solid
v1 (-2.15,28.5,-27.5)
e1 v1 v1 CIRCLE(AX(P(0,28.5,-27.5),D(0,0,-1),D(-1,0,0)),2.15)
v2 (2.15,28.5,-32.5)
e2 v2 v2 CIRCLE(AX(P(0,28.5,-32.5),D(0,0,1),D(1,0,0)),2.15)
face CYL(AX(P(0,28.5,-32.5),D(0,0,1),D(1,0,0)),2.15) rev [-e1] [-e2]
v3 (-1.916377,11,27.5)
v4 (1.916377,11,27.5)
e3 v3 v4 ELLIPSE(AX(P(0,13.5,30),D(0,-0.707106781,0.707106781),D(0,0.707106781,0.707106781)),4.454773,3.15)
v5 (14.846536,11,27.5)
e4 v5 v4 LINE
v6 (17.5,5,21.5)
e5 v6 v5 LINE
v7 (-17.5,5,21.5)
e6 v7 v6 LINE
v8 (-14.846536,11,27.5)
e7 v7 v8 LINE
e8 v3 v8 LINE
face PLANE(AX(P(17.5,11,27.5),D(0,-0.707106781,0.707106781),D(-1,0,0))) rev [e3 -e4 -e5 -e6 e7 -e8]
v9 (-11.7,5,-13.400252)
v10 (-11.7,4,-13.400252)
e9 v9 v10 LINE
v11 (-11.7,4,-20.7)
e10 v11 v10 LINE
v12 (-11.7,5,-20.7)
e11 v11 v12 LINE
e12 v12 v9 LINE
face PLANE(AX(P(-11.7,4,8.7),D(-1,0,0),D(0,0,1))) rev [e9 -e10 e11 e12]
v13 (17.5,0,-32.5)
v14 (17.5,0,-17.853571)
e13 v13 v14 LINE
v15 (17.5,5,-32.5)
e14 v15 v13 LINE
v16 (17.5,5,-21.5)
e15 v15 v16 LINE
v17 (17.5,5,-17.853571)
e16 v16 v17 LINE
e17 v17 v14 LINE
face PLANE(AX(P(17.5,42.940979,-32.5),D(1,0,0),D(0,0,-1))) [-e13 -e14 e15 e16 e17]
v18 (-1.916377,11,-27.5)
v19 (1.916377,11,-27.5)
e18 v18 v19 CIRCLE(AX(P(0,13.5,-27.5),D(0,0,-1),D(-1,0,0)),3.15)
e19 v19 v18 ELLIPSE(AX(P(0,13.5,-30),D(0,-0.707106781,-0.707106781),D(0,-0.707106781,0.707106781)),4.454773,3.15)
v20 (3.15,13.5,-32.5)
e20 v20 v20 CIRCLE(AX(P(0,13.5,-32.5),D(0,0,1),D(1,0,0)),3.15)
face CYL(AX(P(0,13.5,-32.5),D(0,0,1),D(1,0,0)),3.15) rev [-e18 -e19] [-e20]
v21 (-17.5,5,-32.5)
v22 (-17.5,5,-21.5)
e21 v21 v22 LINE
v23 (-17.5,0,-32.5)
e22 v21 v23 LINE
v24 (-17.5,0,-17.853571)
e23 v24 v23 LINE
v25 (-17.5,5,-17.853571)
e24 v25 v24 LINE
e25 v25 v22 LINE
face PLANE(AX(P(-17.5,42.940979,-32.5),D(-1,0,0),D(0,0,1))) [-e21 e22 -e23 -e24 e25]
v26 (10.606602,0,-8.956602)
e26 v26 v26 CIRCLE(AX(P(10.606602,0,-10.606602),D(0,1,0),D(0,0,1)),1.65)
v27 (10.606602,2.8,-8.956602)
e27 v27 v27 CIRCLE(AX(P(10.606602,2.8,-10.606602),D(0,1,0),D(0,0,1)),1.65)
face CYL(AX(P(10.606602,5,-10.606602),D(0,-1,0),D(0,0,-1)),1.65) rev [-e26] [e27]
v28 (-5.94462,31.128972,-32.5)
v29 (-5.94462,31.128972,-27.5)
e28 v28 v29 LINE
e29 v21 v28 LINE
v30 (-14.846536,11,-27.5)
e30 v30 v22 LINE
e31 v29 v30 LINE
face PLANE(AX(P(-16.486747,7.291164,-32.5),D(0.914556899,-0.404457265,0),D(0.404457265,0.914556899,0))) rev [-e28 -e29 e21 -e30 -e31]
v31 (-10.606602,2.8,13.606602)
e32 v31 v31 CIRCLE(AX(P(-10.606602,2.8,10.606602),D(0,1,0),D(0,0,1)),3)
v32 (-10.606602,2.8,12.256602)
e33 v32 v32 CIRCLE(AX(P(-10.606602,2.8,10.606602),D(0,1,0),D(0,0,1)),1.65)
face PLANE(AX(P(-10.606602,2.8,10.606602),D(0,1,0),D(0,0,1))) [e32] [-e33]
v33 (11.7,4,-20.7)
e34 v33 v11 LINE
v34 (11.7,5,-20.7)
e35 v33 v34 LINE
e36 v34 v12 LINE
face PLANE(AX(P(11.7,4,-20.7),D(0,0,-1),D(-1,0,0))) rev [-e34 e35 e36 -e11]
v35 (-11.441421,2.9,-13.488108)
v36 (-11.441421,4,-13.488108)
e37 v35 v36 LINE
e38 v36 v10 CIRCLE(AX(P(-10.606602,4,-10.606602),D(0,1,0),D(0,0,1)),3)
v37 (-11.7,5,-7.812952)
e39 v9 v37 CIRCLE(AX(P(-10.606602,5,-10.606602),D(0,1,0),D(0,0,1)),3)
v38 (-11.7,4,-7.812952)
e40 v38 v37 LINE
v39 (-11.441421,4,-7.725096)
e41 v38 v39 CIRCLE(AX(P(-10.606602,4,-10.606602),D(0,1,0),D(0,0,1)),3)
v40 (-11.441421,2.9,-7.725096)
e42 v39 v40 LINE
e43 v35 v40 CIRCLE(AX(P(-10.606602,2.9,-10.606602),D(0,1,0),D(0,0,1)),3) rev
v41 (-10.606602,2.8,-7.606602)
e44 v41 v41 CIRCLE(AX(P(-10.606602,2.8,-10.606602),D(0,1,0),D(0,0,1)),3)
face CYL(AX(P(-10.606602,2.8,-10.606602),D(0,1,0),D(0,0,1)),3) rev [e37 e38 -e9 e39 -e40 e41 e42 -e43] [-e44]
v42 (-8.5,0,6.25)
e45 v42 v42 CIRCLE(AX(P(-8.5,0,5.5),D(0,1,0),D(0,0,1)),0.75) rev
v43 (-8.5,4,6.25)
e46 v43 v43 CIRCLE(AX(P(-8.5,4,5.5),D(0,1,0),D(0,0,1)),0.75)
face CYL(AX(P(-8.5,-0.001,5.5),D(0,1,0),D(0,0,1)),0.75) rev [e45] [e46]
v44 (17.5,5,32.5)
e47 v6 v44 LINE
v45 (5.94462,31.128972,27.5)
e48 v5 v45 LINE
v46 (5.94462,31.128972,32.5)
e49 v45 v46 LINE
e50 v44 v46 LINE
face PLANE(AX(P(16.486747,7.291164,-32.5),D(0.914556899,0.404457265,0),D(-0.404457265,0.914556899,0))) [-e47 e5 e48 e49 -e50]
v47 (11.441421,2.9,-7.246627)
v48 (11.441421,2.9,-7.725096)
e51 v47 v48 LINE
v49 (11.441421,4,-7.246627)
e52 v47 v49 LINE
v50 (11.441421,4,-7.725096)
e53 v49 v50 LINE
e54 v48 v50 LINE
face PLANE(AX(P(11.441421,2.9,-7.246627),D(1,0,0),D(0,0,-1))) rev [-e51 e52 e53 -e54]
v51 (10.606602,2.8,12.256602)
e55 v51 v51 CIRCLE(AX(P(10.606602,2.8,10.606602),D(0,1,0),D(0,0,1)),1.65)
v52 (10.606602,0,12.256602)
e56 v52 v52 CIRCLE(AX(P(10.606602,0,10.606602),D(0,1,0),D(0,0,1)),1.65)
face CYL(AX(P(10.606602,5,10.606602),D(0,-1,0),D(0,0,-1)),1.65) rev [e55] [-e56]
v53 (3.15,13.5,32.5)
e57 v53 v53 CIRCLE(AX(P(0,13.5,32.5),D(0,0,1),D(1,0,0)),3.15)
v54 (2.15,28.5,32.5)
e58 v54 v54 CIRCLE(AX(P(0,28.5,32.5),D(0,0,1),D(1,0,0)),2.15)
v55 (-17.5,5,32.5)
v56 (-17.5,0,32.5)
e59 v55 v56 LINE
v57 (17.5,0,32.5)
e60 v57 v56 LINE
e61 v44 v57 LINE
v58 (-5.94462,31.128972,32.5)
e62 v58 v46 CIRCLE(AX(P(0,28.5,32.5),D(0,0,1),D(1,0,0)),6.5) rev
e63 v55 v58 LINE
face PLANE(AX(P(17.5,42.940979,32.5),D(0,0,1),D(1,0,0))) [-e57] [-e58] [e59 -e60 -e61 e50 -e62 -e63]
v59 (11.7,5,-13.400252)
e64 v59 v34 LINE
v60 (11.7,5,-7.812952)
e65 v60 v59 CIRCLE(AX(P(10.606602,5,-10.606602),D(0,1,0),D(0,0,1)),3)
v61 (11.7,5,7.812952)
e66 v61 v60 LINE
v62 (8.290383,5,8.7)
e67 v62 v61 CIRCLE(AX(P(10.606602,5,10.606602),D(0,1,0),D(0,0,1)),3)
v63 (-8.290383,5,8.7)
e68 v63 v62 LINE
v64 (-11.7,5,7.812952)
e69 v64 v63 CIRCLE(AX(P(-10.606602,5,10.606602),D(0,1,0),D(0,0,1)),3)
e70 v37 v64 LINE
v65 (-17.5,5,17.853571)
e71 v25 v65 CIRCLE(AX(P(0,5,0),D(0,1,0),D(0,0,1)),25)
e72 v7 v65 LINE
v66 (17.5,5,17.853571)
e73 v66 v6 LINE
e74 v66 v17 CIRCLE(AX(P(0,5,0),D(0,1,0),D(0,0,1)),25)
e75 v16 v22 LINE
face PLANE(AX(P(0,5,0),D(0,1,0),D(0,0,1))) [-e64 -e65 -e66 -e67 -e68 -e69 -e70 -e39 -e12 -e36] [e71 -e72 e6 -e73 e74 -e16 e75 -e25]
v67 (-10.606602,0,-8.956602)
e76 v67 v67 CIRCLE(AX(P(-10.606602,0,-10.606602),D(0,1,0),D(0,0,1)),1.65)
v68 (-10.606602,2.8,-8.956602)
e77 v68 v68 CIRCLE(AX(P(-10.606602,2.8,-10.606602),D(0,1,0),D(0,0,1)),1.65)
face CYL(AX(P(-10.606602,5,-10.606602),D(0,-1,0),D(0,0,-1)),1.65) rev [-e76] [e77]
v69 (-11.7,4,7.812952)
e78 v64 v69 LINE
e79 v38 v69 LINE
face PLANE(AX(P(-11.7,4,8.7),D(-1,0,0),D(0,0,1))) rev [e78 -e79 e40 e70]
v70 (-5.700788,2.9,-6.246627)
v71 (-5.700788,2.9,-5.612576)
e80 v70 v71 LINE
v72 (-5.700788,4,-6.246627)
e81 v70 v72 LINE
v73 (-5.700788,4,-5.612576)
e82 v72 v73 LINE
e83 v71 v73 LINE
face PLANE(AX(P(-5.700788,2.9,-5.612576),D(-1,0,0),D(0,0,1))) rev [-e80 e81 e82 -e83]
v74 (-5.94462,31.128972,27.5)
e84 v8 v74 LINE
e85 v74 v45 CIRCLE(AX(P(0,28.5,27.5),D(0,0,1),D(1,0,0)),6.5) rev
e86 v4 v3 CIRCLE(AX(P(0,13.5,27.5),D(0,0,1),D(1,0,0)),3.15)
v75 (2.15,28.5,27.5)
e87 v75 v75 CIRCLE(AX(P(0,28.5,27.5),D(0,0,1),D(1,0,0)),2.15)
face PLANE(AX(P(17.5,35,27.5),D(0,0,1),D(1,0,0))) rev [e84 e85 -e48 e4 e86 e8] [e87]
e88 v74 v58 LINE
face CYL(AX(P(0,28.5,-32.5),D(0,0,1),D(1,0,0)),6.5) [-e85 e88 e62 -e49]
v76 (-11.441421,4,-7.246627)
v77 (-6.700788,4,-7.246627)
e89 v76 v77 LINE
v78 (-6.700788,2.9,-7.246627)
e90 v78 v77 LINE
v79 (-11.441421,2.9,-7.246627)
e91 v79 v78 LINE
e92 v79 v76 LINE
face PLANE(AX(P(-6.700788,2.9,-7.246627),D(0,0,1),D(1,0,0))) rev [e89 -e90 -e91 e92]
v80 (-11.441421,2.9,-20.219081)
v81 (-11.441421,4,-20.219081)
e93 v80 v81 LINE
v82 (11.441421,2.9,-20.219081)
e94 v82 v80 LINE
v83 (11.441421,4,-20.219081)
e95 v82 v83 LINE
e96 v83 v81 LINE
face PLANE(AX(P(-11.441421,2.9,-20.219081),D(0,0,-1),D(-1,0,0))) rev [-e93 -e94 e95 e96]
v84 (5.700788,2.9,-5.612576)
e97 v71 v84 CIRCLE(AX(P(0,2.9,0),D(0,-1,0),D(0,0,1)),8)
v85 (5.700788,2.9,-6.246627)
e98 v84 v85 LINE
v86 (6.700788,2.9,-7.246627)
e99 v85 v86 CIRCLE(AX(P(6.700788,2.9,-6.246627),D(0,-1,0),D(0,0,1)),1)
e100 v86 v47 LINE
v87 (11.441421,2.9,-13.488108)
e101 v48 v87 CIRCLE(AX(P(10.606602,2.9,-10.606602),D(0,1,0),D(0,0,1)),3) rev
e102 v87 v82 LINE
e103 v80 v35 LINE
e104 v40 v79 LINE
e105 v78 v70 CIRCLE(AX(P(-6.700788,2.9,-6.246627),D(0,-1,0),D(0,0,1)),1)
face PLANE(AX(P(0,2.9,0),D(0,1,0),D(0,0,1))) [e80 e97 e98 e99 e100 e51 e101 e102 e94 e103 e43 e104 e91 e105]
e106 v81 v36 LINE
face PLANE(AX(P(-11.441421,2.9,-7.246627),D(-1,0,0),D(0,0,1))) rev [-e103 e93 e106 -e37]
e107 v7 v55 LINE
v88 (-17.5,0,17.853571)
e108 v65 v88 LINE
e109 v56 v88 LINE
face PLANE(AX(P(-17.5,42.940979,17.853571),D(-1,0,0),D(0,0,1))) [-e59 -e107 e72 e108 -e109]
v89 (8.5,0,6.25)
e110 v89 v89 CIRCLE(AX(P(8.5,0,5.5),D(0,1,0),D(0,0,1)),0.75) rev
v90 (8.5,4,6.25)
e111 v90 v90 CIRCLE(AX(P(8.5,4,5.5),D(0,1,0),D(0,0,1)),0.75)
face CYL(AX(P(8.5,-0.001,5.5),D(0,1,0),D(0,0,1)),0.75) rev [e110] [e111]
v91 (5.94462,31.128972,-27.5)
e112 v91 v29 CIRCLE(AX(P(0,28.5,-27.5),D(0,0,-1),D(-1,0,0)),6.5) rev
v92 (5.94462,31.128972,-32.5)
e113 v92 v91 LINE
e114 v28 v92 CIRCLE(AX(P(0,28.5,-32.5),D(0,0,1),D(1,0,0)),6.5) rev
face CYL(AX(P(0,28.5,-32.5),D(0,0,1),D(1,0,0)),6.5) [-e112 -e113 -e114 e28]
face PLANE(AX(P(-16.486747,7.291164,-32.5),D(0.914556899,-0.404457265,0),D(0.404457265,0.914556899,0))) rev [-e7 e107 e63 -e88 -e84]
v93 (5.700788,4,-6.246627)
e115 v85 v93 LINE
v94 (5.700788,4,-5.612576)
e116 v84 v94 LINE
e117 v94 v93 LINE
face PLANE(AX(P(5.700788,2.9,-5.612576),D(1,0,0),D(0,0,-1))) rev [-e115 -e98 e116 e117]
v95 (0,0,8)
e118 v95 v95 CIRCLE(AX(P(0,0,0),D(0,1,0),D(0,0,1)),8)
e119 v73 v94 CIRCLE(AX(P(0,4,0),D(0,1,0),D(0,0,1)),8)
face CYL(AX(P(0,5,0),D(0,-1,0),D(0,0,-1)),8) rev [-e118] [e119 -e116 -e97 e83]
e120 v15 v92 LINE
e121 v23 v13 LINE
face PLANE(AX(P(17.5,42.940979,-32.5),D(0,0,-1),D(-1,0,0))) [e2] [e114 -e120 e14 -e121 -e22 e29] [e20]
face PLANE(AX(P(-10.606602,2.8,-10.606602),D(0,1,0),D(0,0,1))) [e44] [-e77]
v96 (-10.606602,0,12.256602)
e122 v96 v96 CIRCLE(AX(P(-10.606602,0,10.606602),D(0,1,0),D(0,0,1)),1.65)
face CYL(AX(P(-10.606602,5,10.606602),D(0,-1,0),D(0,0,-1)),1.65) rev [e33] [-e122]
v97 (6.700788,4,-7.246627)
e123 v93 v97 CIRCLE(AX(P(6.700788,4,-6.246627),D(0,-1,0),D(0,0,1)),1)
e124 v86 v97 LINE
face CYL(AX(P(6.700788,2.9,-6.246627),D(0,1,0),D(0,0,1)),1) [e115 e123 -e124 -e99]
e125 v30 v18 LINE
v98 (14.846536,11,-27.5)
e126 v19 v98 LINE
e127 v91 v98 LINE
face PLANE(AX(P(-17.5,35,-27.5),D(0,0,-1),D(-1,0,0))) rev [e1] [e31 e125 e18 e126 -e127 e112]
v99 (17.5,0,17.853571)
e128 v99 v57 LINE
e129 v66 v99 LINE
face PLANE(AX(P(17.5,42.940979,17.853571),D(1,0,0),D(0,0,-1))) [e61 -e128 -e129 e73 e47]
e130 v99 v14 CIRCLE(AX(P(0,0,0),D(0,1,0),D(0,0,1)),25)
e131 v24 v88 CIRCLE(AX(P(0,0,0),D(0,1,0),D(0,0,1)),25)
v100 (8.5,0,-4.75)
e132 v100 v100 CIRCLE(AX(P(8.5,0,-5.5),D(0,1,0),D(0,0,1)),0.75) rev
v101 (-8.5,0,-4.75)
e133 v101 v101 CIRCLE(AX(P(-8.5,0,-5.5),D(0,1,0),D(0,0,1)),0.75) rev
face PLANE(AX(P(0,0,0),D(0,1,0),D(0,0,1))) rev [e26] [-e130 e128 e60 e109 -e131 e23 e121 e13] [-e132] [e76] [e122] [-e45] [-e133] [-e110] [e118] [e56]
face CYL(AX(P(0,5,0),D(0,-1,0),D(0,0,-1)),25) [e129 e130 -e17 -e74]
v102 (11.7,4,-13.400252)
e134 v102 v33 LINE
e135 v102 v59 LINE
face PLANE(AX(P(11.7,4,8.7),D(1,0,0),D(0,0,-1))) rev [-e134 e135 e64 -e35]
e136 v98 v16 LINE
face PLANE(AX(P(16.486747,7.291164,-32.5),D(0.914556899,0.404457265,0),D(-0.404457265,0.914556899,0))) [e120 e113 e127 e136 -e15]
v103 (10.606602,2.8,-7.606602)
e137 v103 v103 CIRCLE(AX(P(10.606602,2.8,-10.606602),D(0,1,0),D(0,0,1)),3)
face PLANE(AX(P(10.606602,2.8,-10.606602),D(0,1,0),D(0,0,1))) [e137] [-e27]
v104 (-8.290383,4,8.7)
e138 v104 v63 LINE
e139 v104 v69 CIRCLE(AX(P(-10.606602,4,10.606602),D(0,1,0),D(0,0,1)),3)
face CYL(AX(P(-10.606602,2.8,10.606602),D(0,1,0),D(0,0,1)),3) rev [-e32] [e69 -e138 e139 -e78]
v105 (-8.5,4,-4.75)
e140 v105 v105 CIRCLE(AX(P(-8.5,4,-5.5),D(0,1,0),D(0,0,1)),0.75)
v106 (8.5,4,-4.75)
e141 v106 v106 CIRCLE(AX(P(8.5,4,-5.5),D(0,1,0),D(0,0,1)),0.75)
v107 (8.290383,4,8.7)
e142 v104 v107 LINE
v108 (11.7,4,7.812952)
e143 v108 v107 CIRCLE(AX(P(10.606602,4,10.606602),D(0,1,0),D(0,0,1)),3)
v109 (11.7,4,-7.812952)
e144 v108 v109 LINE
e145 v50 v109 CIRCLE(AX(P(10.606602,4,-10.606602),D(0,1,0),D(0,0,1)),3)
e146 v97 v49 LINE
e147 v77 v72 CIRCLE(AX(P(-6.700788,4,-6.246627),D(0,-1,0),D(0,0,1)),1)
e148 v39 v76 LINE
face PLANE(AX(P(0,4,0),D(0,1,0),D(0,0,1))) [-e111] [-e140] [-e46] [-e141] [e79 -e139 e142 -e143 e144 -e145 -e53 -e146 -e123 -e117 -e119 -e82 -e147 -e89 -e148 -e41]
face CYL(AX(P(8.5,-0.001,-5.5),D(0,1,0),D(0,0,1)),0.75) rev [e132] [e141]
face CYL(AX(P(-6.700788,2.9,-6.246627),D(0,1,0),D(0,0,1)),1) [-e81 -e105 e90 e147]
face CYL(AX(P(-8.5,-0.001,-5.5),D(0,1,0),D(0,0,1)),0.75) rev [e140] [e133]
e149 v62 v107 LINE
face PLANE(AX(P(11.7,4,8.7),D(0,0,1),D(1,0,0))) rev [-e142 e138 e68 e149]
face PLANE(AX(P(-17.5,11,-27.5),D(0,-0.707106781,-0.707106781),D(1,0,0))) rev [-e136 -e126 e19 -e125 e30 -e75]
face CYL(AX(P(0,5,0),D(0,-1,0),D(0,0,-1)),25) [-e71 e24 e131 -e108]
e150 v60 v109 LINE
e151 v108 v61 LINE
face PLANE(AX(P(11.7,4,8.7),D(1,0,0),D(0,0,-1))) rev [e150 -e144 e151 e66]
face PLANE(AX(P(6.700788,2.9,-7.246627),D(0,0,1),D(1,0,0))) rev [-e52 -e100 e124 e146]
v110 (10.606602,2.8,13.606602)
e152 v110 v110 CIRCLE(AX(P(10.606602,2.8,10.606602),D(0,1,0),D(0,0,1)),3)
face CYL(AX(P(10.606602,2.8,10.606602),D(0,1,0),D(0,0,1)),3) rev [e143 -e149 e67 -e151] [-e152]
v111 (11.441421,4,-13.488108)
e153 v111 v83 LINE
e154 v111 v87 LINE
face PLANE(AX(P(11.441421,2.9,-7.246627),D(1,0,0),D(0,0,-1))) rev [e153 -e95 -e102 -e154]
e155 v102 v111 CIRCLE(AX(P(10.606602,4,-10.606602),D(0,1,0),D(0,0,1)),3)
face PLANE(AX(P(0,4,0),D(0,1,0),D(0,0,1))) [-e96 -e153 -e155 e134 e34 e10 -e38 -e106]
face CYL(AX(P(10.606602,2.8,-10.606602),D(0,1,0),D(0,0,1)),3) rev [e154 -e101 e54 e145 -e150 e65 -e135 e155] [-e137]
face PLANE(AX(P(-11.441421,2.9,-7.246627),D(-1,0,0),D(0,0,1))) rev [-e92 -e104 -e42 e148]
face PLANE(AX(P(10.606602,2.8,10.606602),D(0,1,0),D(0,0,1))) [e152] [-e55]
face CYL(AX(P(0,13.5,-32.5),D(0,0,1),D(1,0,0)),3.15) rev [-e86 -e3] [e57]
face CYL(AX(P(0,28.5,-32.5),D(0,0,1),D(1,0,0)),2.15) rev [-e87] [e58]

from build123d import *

# Parameters (mm, degrees)
SKETCH_1_R                = 25
SKETCH_1_R_2              = 8
SKETCH_1_R_3              = 1.65
EXTRUDE_1_DEPTH           = 5
SKETCH_5_W                = 23.4
SKETCH_5_H                = 29.4
CUT_EXTRUDE_1_DEPTH       = 1
SKETCH_6_R                = 3
CUT_EXTRUDE_2_DEPTH       = 2.2
CUT_EXTRUDE_3_REACH       = 37.581
SKETCH_9_R                = 0.75
CUT_EXTRUDE_START         = -1.1
CUT_EXTRUDE_4_DEPTH       = 1.1
EXTRUDE_3_DEPTH           = 5
SKETCH_13_W               = 35
SKETCH_13_H               = 5
EXTRUDE_4_DEPTH           = 30
CHAMFER_1_SIZE            = 6
CUT_EXTRUDE_START_2       = -65
CUT_EXTRUDE_5_OUTLINE_R   = 2.15
CUT_EXTRUDE_5_OUTLINE_R_2 = 3.15
CUT_EXTRUDE_5_DEPTH       = 65


# Read off the part's stored shape, not the designer's step: 切除-拉伸5
with BuildPart() as part:
    # 草图1 → 凸台-拉伸1 (new body)
    with BuildSketch(Plane(origin=(0, 0, 0), x_dir=(1, 0, 0), z_dir=(0, 1, 0))):
        with Locations(Location((0, 0, 0), (0, 0, 270))):
            Circle(SKETCH_1_R)
        with Locations(Location((0, 0, 0), (0, 0, 270))):
            Circle(SKETCH_1_R_2, mode=Mode.SUBTRACT)
        with Locations(Location((10.606601718, 10.606601718, 0), (0, 0, 270))):
            Circle(SKETCH_1_R_3, mode=Mode.SUBTRACT)
        with Locations(Location((-10.606601718, 10.606601718, 0), (0, 0, 270))):
            Circle(SKETCH_1_R_3, mode=Mode.SUBTRACT)
        with Locations(Location((-10.606601718, -10.606601718, 0), (0, 0, 270))):
            Circle(SKETCH_1_R_3, mode=Mode.SUBTRACT)
        with Locations(Location((10.606601718, -10.606601718, 0), (0, 0, 270))):
            Circle(SKETCH_1_R_3, mode=Mode.SUBTRACT)
    extrude(amount=EXTRUDE_1_DEPTH)

    # 草图5 → 切除-拉伸1 (cut)
    with BuildSketch(Plane(origin=(0, 5, 0), x_dir=(1, 0, 0), z_dir=(0, 1, 0))):
        with Locations((0, 6)):
            Rectangle(SKETCH_5_W, SKETCH_5_H)
    extrude(amount=-CUT_EXTRUDE_1_DEPTH, mode=Mode.SUBTRACT)

    # 草图6 → 切除-拉伸2 (cut)
    with BuildSketch(Plane(origin=(0, 5, 0), x_dir=(1, 0, 0), z_dir=(0, 1, 0))):
        with Locations(Location((-10.606601718, 10.606601718, 0), (0, 0, 270))):
            Circle(SKETCH_6_R)
        with Locations(Location((10.606601718, 10.606601718, 0), (0, 0, 270))):
            Circle(SKETCH_6_R)
        with Locations(Location((10.606601718, -10.606601718, 0), (0, 0, 270))):
            Circle(SKETCH_6_R)
        with Locations(Location((-10.606601718, -10.606601718, 0), (0, 0, 270))):
            Circle(SKETCH_6_R)
    extrude(amount=-CUT_EXTRUDE_2_DEPTH, mode=Mode.SUBTRACT)

    # 草图9 → 切除-拉伸3 (cut, up to next)
    with BuildSketch(Plane(origin=(0, 4, 0), x_dir=(1, 0, 0), z_dir=(0, 1, 0)), mode=Mode.PRIVATE) as cut_extrude_3_sk1:
        with Locations(Location((-8.5, 5.5, 0), (0, 0, 270))):
            Circle(SKETCH_9_R)
    cut_extrude_3_tool1 = extrude(cut_extrude_3_sk1.sketch, amount=-CUT_EXTRUDE_3_REACH, mode=Mode.PRIVATE) & part.part
    # 草图9 → 切除-拉伸3 (cut, up to next)
    with BuildSketch(Plane(origin=(0, 4, 0), x_dir=(1, 0, 0), z_dir=(0, 1, 0)), mode=Mode.PRIVATE) as cut_extrude_3_sk2:
        with Locations(Location((8.5, 5.5, 0), (0, 0, 270))):
            Circle(SKETCH_9_R)
    cut_extrude_3_tool2 = extrude(cut_extrude_3_sk2.sketch, amount=-CUT_EXTRUDE_3_REACH, mode=Mode.PRIVATE) & part.part
    # 草图9 → 切除-拉伸3 (cut, up to next)
    with BuildSketch(Plane(origin=(0, 4, 0), x_dir=(1, 0, 0), z_dir=(0, 1, 0)), mode=Mode.PRIVATE) as cut_extrude_3_sk3:
        with Locations(Location((8.5, -5.5, 0), (0, 0, 270))):
            Circle(SKETCH_9_R)
    cut_extrude_3_tool3 = extrude(cut_extrude_3_sk3.sketch, amount=-CUT_EXTRUDE_3_REACH, mode=Mode.PRIVATE) & part.part
    # 草图9 → 切除-拉伸3 (cut, up to next)
    with BuildSketch(Plane(origin=(0, 4, 0), x_dir=(1, 0, 0), z_dir=(0, 1, 0)), mode=Mode.PRIVATE) as cut_extrude_3_sk4:
        with Locations(Location((-8.5, -5.5, 0), (0, 0, 270))):
            Circle(SKETCH_9_R)
    cut_extrude_3_tool4 = extrude(cut_extrude_3_sk4.sketch, amount=-CUT_EXTRUDE_3_REACH, mode=Mode.PRIVATE) & part.part
    add(cut_extrude_3_tool1.solids().sort_by_distance((-8.5, 4, -5.5))[0], mode=Mode.SUBTRACT)
    add(cut_extrude_3_tool2.solids().sort_by_distance((8.5, 4, -5.5))[0], mode=Mode.SUBTRACT)
    add(cut_extrude_3_tool3.solids().sort_by_distance((8.5, 4, 5.5))[0], mode=Mode.SUBTRACT)
    add(cut_extrude_3_tool4.solids().sort_by_distance((-8.5, 4, 5.5))[0], mode=Mode.SUBTRACT)

    # 草图10 → 切除-拉伸4 (cut)
    with BuildSketch(Plane(origin=(0, 4, 0), x_dir=(1, 0, 0), z_dir=(0, 1, 0)).offset(CUT_EXTRUDE_START)):
        with BuildLine():
            Line((-5.700788223, 5.612576381), (-5.700788223, 6.246626792))
            ThreePointArc((-5.700788223, 6.246626792), (-5.993681442, 6.953733574), (-6.700788223, 7.246626792))
            Line((-6.700788223, 7.246626792), (-11.441421376, 7.246626792))
            Line((-11.441421376, 7.246626792), (-11.441421376, 20.219080974))
            Line((-11.441421376, 20.219080974), (11.441421376, 20.219080974))
            Line((11.441421376, 20.219080974), (11.441421376, 7.246626792))
            Line((11.441421376, 7.246626792), (6.700788223, 7.246626792))
            ThreePointArc((6.700788223, 7.246626792), (5.993681442, 6.953733574), (5.700788223, 6.246626792))
            Line((5.700788223, 6.246626792), (5.700788223, 5.612576381))
            ThreePointArc((5.700788223, 5.612576381), (0, 8), (-5.700788223, 5.612576381))
        make_face()
    extrude(amount=CUT_EXTRUDE_4_DEPTH, mode=Mode.SUBTRACT)

    # 草图12 → 凸台-拉伸3 (add)
    with BuildSketch(Plane.XZ):
        with BuildLine():
            Line((17.5, 17.853571071), (17.5, 32.5))
            Line((17.5, 32.5), (-17.5, 32.5))
            Line((-17.5, 32.5), (-17.5, 17.853571071))
            ThreePointArc((-17.5, 17.853571071), (0, 25), (17.5, 17.853571071))
        make_face()
        with BuildLine():
            Line((17.5, -32.5), (-17.5, -32.5))
            Line((-17.5, -32.5), (-17.5, -17.853571071))
            ThreePointArc((-17.5, -17.853571071), (0, -25), (17.5, -17.853571071))
            Line((17.5, -17.853571071), (17.5, -32.5))
        make_face()
    extrude(amount=-EXTRUDE_3_DEPTH)

    # 草图13 → 凸台-拉伸4 (add)
    with BuildSketch(Plane(origin=(0, 5, 0), x_dir=(1, 0, 0), z_dir=(0, 1, 0))):
        with Locations((0, 30)):
            Rectangle(SKETCH_13_W, SKETCH_13_H)
        with Locations((0, -30)):
            Rectangle(SKETCH_13_W, SKETCH_13_H)
    extrude(amount=EXTRUDE_4_DEPTH)

    # 倒角1
    chamfer_1_edges = [part.edges().sort_by_distance(p)[0] for p in [
        (0, 5, -27.5),
        (0, 5, 27.5),
    ]]
    chamfer(chamfer_1_edges, length=CHAMFER_1_SIZE)

    # 切除-拉伸5 outline → 切除-拉伸5 (cut)
    with BuildSketch(Plane.XY.offset(32.5).offset(CUT_EXTRUDE_START_2)):
        with BuildLine():
            ThreePointArc((-5.944619841, 31.128972222), (-3.546948023, 33.9469404), (0, 35))
            Line((0, 35), (-17.5, 35))
            Line((-17.5, 35), (-17.5, 5))
            Line((-17.5, 5), (-5.944619841, 31.128972222))
        make_face()
        with BuildLine():
            Line((5.944619841, 31.128972222), (17.5, 5))
            Line((17.5, 5), (17.5, 35))
            Line((17.5, 35), (0, 35))
            ThreePointArc((0, 35), (3.546948023, 33.9469404), (5.944619841, 31.128972222))
        make_face()
        with Locations((0, 28.5)):
            Circle(CUT_EXTRUDE_5_OUTLINE_R)
        with Locations((0, 13.5)):
            Circle(CUT_EXTRUDE_5_OUTLINE_R_2)
    extrude(amount=CUT_EXTRUDE_5_DEPTH, mode=Mode.SUBTRACT)


solid = part.part
